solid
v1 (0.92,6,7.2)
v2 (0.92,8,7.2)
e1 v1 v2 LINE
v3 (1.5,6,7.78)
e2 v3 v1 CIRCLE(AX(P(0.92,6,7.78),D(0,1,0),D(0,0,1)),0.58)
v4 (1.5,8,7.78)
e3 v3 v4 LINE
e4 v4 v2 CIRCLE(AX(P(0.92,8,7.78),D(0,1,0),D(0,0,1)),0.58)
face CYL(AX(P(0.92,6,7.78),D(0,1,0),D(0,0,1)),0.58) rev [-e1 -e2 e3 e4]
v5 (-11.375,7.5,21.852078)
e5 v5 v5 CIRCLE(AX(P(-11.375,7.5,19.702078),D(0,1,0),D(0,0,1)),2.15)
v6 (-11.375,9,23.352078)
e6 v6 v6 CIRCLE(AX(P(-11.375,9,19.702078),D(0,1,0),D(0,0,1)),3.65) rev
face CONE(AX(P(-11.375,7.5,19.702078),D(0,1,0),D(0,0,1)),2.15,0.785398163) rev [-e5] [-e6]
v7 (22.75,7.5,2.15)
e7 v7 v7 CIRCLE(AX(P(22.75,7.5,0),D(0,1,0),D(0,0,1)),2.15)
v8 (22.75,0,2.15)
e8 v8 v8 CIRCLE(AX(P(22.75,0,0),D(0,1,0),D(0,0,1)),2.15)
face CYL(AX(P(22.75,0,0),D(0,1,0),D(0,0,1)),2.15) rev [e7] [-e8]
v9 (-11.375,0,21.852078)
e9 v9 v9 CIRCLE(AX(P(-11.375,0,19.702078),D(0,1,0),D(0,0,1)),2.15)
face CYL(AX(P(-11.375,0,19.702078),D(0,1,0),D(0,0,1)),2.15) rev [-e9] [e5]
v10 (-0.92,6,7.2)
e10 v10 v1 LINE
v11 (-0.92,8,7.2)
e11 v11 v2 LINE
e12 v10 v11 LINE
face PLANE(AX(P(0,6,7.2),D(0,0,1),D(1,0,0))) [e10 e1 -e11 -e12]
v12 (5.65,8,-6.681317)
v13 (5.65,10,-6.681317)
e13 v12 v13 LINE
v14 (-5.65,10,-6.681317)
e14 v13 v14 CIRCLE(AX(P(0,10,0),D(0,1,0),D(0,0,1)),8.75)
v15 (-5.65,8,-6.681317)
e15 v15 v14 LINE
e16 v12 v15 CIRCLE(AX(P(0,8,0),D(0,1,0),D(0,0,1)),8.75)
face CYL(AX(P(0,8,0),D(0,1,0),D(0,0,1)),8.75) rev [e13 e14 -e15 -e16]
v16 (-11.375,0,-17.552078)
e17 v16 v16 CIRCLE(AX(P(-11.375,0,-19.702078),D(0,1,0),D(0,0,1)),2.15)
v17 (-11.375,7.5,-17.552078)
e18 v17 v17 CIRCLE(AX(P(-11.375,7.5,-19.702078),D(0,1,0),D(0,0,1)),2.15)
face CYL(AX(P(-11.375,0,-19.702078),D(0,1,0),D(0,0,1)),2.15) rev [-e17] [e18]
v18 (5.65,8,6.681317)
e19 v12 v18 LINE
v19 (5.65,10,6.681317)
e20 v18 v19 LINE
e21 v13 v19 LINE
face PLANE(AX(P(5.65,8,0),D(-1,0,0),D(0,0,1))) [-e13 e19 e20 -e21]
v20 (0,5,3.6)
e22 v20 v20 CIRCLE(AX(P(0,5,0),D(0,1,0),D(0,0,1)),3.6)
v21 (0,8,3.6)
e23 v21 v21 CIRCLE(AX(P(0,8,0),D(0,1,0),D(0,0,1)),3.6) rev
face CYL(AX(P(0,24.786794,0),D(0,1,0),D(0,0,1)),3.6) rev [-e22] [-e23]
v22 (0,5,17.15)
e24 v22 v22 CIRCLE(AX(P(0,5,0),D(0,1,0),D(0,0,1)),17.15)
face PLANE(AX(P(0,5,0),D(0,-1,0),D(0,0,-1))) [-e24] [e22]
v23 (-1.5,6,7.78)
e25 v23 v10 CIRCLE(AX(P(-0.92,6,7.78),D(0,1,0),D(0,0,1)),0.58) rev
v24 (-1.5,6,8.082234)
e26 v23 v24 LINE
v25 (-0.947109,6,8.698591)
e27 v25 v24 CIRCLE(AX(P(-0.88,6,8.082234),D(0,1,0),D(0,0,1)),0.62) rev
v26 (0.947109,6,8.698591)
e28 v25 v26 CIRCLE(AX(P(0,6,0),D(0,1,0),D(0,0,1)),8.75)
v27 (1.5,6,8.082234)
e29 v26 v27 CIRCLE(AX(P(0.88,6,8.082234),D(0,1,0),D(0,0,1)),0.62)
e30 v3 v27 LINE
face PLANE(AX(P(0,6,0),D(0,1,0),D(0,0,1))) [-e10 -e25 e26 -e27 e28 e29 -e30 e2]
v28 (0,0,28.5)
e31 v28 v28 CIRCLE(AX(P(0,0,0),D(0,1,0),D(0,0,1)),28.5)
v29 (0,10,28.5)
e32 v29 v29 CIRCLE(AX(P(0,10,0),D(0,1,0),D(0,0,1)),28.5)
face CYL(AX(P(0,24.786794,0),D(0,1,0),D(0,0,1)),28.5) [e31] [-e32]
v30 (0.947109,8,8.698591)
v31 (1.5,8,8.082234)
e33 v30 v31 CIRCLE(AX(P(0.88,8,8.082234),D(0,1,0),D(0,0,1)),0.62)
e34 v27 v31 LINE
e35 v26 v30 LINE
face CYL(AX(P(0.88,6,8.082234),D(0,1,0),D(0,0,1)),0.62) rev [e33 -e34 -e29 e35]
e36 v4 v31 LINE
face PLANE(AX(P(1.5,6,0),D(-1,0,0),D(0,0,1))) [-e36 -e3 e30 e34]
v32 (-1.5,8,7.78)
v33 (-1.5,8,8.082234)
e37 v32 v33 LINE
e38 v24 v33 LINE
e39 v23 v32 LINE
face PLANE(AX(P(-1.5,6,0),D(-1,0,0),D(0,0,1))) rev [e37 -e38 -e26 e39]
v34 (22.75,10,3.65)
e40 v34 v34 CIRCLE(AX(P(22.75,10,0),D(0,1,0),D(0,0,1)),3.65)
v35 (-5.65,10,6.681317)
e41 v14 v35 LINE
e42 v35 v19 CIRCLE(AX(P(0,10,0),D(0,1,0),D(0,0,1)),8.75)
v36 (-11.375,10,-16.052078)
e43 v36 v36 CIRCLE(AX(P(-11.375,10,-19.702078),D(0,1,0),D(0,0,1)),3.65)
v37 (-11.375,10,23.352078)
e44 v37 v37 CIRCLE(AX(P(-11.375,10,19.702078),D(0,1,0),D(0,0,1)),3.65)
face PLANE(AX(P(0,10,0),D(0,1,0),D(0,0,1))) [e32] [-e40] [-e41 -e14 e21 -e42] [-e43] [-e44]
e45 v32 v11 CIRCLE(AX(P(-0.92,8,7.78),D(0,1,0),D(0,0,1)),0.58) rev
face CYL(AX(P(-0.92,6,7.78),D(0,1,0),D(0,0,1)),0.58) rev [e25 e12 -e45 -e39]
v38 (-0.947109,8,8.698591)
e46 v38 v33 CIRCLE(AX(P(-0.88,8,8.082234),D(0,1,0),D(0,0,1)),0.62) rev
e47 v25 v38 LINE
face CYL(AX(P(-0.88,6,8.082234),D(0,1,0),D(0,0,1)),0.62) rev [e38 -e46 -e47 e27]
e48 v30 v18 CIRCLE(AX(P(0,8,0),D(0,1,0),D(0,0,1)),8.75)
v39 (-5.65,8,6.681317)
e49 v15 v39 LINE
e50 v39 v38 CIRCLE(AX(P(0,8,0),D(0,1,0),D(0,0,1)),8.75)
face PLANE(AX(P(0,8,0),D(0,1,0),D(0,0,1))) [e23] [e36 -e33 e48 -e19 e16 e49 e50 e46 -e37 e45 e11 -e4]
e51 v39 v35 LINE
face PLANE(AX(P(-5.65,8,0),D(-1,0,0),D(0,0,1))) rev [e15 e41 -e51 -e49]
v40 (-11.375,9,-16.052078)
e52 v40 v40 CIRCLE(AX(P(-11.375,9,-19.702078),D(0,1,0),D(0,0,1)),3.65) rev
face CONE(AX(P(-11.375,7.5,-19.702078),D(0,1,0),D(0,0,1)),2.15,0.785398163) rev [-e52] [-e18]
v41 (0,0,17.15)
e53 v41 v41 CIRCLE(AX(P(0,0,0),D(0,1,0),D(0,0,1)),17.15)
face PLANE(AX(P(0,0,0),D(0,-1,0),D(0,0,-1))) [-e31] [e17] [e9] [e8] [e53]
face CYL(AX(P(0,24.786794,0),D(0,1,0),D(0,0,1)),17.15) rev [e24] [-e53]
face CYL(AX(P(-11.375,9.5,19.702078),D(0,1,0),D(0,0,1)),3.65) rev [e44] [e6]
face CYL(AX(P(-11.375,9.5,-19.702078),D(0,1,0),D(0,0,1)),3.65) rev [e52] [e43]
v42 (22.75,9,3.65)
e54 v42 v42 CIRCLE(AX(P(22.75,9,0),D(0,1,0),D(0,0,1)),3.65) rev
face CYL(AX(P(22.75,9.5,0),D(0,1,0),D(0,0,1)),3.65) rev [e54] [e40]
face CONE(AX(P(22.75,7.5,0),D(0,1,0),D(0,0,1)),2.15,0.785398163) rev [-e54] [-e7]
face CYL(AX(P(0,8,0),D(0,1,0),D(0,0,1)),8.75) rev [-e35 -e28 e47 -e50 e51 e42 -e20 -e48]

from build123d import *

# Parameters (mm, degrees)
SKETCH_714_R           = 3.6
CUT_EXTRUDE_1503_DEPTH = 2
CUT_EXTRUDE_1558_DEPTH = 4
SKETCH_1765_R          = 2.15
CUT_EXTRUDE_2399_DEPTH = 42.527099586
SKETCH_3_5_R           = 3.65
CUT_EXTRUDE_2433_DEPTH = 0.5
CHAMFER_3010_SIZE      = 2


with BuildPart() as part:
    # Sketch 314 → Повернуть1 (revolve)
    with BuildSketch(Plane.XY, mode=Mode.PRIVATE) as revolve_1_sk:
        Polygon((3.6, 10), (28.5, 10), (28.5, 0), (17.15, 0), (17.15, 5), (3.6, 5), align=None)
    revolve(revolve_1_sk.sketch.rotate(Axis((0, 24.786794377, 0), (0, -1, 0)), 90), axis=Axis((0, 24.786794377, 0), (0, -1, 0)))

    # Sketch 714 → Cut-Extrude 1503 (cut)
    # profile 1 of 2: a face of its own
    with BuildSketch(Plane(origin=(0, 10, 0), x_dir=(1, 0, 0), z_dir=(0, 1, 0))):
        with BuildLine():
            ThreePointArc((-1.5, -7.78), (-1.330121933, -7.369878067), (-0.92, -7.2))
            Line((-0.92, -7.2), (0.92, -7.2))
            ThreePointArc((0.92, -7.2), (1.330121933, -7.369878067), (1.5, -7.78))
            Line((1.5, -7.78), (1.5, -8.082233602))
            ThreePointArc((1.5, -8.082233602), (1.341523495, -8.496233679), (0.947109471, -8.6985909))
            ThreePointArc((0.947109471, -8.6985909), (3.449320455, -8.041435717), (5.65, -6.681317235))
            Line((5.65, -6.681317235), (5.65, 6.681317235))
            ThreePointArc((5.65, 6.681317235), (0, 8.75), (-5.65, 6.681317235))
            Line((-5.65, 6.681317235), (-5.65, -6.681317235))
            ThreePointArc((-5.65, -6.681317235), (-3.449320455, -8.041435717), (-0.947109471, -8.6985909))
            ThreePointArc((-0.947109471, -8.6985909), (-1.341523495, -8.496233679), (-1.5, -8.082233602))
            Line((-1.5, -8.082233602), (-1.5, -7.78))
        make_face()
        with Locations(Location((0, 0, 0), (0, 0, 270))):
            Circle(SKETCH_714_R, mode=Mode.SUBTRACT)
    # profile 2 of 2: a face of its own
    with BuildSketch(Plane(origin=(0, 10, 0), x_dir=(1, 0, 0), z_dir=(0, 1, 0))):
        with BuildLine():
            ThreePointArc((-1.5, -7.78), (-1.330121933, -7.369878067), (-0.92, -7.2))
            Line((-0.92, -7.2), (0.92, -7.2))
            ThreePointArc((0.92, -7.2), (1.330121933, -7.369878067), (1.5, -7.78))
            Line((1.5, -7.78), (1.5, -8.082233602))
            ThreePointArc((1.5, -8.082233602), (1.341523495, -8.496233679), (0.947109471, -8.6985909))
            ThreePointArc((0.947109471, -8.6985909), (0, -8.75), (-0.947109471, -8.6985909))
            ThreePointArc((-0.947109471, -8.6985909), (-1.341523495, -8.496233679), (-1.5, -8.082233602))
            Line((-1.5, -8.082233602), (-1.5, -7.78))
        make_face()
    extrude(amount=-CUT_EXTRUDE_1503_DEPTH, mode=Mode.SUBTRACT)

    # Эскиз2<3> → Cut-Extrude 1558 (cut)
    with BuildSketch(Plane(origin=(0, 10, 0), x_dir=(1, 0, 0), z_dir=(0, 1, 0))):
        with BuildLine():
            ThreePointArc((-1.5, -7.78), (-1.330121933, -7.369878067), (-0.92, -7.2))
            Line((-0.92, -7.2), (0.92, -7.2))
            ThreePointArc((0.92, -7.2), (1.330121933, -7.369878067), (1.5, -7.78))
            Line((1.5, -7.78), (1.5, -8.082233602))
            ThreePointArc((1.5, -8.082233602), (1.341523495, -8.496233679), (0.947109471, -8.6985909))
            ThreePointArc((0.947109471, -8.6985909), (0, -8.75), (-0.947109471, -8.6985909))
            ThreePointArc((-0.947109471, -8.6985909), (-1.341523495, -8.496233679), (-1.5, -8.082233602))
            Line((-1.5, -8.082233602), (-1.5, -7.78))
        make_face()
    extrude(amount=-CUT_EXTRUDE_1558_DEPTH, mode=Mode.SUBTRACT)

    # Sketch 1765 → Cut-Extrude 2399 (cut, through all)
    with BuildSketch(Plane(origin=(0, 10, 0), x_dir=(1, 0, 0), z_dir=(0, 1, 0))):
        with Locations(Location((22.75, 0, 0), (0, 0, 270))):
            Circle(SKETCH_1765_R)
        with Locations(Location((-11.375, -19.702077936, 0), (0, 0, 270))):
            Circle(SKETCH_1765_R)
        with Locations(Location((-11.375, 19.702077936, 0), (0, 0, 270))):
            Circle(SKETCH_1765_R)
    extrude(amount=-CUT_EXTRUDE_2399_DEPTH, mode=Mode.SUBTRACT)

    # Эскиз3<5> → Cut-Extrude 2433 (cut)
    with BuildSketch(Plane(origin=(0, 10, 0), x_dir=(1, 0, 0), z_dir=(0, 1, 0))):
        with Locations(Location((22.75, 0, 0), (0, 0, 270))):
            Circle(SKETCH_3_5_R)
        with Locations(Location((-11.375, -19.702077936, 0), (0, 0, 270))):
            Circle(SKETCH_3_5_R)
        with Locations(Location((-11.375, 19.702077936, 0), (0, 0, 270))):
            Circle(SKETCH_3_5_R)
    extrude(amount=-CUT_EXTRUDE_2433_DEPTH, mode=Mode.SUBTRACT)

    # Chamfer 3010
    # the kernel refuses this chamfer: 2 mm, written as the material it takes off along each edge
    with BuildSketch(Plane(origin=(-11.375, 9.5, -19.702077936), x_dir=(0, 0, 1), z_dir=(-1, 0, 0))) as chamfer_3010_piece_1_section:
        Polygon((2.15 + CHAMFER_3010_SIZE, 0), (2.15, -CHAMFER_3010_SIZE), (2.15, 0), align=None)
    chamfer_3010_piece_1 = revolve(axis=Axis((-11.375, 9.5, -19.702077936), (0, 1, 0)), mode=Mode.PRIVATE)
    chamfer_3010_piece_1 = chamfer_3010_piece_1 & Plane(origin=(-11.375, 8.244810857, -19.702077936), x_dir=(0, 0, 1), z_dir=(0, 1, 0)) * Cylinder(3.65, 17, mode=Mode.PRIVATE)
    add(chamfer_3010_piece_1, mode=Mode.SUBTRACT)
    with BuildSketch(Plane(origin=(22.75, 9.5, 0), x_dir=(0, 0, 1), z_dir=(-1, 0, 0))) as chamfer_3010_piece_2_section:
        Polygon((2.15 + CHAMFER_3010_SIZE, 0), (2.15, -CHAMFER_3010_SIZE), (2.15, 0), align=None)
    chamfer_3010_piece_2 = revolve(axis=Axis((22.75, 9.5, 0), (0, 1, 0)), mode=Mode.PRIVATE)
    chamfer_3010_piece_2 = chamfer_3010_piece_2 & Plane(origin=(22.75, 8.244810857, 0), x_dir=(0, 0, 1), z_dir=(0, 1, 0)) * Cylinder(3.65, 17, mode=Mode.PRIVATE)
    add(chamfer_3010_piece_2, mode=Mode.SUBTRACT)
    with BuildSketch(Plane(origin=(-11.375, 9.5, 19.702077936), x_dir=(0, 0, 1), z_dir=(-1, 0, 0))) as chamfer_3010_piece_3_section:
        Polygon((2.15 + CHAMFER_3010_SIZE, 0), (2.15, -CHAMFER_3010_SIZE), (2.15, 0), align=None)
    chamfer_3010_piece_3 = revolve(axis=Axis((-11.375, 9.5, 19.702077936), (0, 1, 0)), mode=Mode.PRIVATE)
    chamfer_3010_piece_3 = chamfer_3010_piece_3 & Plane(origin=(-11.375, 8.244810857, 19.702077936), x_dir=(0, 0, 1), z_dir=(0, 1, 0)) * Cylinder(3.65, 17, mode=Mode.PRIVATE)
    add(chamfer_3010_piece_3, mode=Mode.SUBTRACT)


solid = part.part
